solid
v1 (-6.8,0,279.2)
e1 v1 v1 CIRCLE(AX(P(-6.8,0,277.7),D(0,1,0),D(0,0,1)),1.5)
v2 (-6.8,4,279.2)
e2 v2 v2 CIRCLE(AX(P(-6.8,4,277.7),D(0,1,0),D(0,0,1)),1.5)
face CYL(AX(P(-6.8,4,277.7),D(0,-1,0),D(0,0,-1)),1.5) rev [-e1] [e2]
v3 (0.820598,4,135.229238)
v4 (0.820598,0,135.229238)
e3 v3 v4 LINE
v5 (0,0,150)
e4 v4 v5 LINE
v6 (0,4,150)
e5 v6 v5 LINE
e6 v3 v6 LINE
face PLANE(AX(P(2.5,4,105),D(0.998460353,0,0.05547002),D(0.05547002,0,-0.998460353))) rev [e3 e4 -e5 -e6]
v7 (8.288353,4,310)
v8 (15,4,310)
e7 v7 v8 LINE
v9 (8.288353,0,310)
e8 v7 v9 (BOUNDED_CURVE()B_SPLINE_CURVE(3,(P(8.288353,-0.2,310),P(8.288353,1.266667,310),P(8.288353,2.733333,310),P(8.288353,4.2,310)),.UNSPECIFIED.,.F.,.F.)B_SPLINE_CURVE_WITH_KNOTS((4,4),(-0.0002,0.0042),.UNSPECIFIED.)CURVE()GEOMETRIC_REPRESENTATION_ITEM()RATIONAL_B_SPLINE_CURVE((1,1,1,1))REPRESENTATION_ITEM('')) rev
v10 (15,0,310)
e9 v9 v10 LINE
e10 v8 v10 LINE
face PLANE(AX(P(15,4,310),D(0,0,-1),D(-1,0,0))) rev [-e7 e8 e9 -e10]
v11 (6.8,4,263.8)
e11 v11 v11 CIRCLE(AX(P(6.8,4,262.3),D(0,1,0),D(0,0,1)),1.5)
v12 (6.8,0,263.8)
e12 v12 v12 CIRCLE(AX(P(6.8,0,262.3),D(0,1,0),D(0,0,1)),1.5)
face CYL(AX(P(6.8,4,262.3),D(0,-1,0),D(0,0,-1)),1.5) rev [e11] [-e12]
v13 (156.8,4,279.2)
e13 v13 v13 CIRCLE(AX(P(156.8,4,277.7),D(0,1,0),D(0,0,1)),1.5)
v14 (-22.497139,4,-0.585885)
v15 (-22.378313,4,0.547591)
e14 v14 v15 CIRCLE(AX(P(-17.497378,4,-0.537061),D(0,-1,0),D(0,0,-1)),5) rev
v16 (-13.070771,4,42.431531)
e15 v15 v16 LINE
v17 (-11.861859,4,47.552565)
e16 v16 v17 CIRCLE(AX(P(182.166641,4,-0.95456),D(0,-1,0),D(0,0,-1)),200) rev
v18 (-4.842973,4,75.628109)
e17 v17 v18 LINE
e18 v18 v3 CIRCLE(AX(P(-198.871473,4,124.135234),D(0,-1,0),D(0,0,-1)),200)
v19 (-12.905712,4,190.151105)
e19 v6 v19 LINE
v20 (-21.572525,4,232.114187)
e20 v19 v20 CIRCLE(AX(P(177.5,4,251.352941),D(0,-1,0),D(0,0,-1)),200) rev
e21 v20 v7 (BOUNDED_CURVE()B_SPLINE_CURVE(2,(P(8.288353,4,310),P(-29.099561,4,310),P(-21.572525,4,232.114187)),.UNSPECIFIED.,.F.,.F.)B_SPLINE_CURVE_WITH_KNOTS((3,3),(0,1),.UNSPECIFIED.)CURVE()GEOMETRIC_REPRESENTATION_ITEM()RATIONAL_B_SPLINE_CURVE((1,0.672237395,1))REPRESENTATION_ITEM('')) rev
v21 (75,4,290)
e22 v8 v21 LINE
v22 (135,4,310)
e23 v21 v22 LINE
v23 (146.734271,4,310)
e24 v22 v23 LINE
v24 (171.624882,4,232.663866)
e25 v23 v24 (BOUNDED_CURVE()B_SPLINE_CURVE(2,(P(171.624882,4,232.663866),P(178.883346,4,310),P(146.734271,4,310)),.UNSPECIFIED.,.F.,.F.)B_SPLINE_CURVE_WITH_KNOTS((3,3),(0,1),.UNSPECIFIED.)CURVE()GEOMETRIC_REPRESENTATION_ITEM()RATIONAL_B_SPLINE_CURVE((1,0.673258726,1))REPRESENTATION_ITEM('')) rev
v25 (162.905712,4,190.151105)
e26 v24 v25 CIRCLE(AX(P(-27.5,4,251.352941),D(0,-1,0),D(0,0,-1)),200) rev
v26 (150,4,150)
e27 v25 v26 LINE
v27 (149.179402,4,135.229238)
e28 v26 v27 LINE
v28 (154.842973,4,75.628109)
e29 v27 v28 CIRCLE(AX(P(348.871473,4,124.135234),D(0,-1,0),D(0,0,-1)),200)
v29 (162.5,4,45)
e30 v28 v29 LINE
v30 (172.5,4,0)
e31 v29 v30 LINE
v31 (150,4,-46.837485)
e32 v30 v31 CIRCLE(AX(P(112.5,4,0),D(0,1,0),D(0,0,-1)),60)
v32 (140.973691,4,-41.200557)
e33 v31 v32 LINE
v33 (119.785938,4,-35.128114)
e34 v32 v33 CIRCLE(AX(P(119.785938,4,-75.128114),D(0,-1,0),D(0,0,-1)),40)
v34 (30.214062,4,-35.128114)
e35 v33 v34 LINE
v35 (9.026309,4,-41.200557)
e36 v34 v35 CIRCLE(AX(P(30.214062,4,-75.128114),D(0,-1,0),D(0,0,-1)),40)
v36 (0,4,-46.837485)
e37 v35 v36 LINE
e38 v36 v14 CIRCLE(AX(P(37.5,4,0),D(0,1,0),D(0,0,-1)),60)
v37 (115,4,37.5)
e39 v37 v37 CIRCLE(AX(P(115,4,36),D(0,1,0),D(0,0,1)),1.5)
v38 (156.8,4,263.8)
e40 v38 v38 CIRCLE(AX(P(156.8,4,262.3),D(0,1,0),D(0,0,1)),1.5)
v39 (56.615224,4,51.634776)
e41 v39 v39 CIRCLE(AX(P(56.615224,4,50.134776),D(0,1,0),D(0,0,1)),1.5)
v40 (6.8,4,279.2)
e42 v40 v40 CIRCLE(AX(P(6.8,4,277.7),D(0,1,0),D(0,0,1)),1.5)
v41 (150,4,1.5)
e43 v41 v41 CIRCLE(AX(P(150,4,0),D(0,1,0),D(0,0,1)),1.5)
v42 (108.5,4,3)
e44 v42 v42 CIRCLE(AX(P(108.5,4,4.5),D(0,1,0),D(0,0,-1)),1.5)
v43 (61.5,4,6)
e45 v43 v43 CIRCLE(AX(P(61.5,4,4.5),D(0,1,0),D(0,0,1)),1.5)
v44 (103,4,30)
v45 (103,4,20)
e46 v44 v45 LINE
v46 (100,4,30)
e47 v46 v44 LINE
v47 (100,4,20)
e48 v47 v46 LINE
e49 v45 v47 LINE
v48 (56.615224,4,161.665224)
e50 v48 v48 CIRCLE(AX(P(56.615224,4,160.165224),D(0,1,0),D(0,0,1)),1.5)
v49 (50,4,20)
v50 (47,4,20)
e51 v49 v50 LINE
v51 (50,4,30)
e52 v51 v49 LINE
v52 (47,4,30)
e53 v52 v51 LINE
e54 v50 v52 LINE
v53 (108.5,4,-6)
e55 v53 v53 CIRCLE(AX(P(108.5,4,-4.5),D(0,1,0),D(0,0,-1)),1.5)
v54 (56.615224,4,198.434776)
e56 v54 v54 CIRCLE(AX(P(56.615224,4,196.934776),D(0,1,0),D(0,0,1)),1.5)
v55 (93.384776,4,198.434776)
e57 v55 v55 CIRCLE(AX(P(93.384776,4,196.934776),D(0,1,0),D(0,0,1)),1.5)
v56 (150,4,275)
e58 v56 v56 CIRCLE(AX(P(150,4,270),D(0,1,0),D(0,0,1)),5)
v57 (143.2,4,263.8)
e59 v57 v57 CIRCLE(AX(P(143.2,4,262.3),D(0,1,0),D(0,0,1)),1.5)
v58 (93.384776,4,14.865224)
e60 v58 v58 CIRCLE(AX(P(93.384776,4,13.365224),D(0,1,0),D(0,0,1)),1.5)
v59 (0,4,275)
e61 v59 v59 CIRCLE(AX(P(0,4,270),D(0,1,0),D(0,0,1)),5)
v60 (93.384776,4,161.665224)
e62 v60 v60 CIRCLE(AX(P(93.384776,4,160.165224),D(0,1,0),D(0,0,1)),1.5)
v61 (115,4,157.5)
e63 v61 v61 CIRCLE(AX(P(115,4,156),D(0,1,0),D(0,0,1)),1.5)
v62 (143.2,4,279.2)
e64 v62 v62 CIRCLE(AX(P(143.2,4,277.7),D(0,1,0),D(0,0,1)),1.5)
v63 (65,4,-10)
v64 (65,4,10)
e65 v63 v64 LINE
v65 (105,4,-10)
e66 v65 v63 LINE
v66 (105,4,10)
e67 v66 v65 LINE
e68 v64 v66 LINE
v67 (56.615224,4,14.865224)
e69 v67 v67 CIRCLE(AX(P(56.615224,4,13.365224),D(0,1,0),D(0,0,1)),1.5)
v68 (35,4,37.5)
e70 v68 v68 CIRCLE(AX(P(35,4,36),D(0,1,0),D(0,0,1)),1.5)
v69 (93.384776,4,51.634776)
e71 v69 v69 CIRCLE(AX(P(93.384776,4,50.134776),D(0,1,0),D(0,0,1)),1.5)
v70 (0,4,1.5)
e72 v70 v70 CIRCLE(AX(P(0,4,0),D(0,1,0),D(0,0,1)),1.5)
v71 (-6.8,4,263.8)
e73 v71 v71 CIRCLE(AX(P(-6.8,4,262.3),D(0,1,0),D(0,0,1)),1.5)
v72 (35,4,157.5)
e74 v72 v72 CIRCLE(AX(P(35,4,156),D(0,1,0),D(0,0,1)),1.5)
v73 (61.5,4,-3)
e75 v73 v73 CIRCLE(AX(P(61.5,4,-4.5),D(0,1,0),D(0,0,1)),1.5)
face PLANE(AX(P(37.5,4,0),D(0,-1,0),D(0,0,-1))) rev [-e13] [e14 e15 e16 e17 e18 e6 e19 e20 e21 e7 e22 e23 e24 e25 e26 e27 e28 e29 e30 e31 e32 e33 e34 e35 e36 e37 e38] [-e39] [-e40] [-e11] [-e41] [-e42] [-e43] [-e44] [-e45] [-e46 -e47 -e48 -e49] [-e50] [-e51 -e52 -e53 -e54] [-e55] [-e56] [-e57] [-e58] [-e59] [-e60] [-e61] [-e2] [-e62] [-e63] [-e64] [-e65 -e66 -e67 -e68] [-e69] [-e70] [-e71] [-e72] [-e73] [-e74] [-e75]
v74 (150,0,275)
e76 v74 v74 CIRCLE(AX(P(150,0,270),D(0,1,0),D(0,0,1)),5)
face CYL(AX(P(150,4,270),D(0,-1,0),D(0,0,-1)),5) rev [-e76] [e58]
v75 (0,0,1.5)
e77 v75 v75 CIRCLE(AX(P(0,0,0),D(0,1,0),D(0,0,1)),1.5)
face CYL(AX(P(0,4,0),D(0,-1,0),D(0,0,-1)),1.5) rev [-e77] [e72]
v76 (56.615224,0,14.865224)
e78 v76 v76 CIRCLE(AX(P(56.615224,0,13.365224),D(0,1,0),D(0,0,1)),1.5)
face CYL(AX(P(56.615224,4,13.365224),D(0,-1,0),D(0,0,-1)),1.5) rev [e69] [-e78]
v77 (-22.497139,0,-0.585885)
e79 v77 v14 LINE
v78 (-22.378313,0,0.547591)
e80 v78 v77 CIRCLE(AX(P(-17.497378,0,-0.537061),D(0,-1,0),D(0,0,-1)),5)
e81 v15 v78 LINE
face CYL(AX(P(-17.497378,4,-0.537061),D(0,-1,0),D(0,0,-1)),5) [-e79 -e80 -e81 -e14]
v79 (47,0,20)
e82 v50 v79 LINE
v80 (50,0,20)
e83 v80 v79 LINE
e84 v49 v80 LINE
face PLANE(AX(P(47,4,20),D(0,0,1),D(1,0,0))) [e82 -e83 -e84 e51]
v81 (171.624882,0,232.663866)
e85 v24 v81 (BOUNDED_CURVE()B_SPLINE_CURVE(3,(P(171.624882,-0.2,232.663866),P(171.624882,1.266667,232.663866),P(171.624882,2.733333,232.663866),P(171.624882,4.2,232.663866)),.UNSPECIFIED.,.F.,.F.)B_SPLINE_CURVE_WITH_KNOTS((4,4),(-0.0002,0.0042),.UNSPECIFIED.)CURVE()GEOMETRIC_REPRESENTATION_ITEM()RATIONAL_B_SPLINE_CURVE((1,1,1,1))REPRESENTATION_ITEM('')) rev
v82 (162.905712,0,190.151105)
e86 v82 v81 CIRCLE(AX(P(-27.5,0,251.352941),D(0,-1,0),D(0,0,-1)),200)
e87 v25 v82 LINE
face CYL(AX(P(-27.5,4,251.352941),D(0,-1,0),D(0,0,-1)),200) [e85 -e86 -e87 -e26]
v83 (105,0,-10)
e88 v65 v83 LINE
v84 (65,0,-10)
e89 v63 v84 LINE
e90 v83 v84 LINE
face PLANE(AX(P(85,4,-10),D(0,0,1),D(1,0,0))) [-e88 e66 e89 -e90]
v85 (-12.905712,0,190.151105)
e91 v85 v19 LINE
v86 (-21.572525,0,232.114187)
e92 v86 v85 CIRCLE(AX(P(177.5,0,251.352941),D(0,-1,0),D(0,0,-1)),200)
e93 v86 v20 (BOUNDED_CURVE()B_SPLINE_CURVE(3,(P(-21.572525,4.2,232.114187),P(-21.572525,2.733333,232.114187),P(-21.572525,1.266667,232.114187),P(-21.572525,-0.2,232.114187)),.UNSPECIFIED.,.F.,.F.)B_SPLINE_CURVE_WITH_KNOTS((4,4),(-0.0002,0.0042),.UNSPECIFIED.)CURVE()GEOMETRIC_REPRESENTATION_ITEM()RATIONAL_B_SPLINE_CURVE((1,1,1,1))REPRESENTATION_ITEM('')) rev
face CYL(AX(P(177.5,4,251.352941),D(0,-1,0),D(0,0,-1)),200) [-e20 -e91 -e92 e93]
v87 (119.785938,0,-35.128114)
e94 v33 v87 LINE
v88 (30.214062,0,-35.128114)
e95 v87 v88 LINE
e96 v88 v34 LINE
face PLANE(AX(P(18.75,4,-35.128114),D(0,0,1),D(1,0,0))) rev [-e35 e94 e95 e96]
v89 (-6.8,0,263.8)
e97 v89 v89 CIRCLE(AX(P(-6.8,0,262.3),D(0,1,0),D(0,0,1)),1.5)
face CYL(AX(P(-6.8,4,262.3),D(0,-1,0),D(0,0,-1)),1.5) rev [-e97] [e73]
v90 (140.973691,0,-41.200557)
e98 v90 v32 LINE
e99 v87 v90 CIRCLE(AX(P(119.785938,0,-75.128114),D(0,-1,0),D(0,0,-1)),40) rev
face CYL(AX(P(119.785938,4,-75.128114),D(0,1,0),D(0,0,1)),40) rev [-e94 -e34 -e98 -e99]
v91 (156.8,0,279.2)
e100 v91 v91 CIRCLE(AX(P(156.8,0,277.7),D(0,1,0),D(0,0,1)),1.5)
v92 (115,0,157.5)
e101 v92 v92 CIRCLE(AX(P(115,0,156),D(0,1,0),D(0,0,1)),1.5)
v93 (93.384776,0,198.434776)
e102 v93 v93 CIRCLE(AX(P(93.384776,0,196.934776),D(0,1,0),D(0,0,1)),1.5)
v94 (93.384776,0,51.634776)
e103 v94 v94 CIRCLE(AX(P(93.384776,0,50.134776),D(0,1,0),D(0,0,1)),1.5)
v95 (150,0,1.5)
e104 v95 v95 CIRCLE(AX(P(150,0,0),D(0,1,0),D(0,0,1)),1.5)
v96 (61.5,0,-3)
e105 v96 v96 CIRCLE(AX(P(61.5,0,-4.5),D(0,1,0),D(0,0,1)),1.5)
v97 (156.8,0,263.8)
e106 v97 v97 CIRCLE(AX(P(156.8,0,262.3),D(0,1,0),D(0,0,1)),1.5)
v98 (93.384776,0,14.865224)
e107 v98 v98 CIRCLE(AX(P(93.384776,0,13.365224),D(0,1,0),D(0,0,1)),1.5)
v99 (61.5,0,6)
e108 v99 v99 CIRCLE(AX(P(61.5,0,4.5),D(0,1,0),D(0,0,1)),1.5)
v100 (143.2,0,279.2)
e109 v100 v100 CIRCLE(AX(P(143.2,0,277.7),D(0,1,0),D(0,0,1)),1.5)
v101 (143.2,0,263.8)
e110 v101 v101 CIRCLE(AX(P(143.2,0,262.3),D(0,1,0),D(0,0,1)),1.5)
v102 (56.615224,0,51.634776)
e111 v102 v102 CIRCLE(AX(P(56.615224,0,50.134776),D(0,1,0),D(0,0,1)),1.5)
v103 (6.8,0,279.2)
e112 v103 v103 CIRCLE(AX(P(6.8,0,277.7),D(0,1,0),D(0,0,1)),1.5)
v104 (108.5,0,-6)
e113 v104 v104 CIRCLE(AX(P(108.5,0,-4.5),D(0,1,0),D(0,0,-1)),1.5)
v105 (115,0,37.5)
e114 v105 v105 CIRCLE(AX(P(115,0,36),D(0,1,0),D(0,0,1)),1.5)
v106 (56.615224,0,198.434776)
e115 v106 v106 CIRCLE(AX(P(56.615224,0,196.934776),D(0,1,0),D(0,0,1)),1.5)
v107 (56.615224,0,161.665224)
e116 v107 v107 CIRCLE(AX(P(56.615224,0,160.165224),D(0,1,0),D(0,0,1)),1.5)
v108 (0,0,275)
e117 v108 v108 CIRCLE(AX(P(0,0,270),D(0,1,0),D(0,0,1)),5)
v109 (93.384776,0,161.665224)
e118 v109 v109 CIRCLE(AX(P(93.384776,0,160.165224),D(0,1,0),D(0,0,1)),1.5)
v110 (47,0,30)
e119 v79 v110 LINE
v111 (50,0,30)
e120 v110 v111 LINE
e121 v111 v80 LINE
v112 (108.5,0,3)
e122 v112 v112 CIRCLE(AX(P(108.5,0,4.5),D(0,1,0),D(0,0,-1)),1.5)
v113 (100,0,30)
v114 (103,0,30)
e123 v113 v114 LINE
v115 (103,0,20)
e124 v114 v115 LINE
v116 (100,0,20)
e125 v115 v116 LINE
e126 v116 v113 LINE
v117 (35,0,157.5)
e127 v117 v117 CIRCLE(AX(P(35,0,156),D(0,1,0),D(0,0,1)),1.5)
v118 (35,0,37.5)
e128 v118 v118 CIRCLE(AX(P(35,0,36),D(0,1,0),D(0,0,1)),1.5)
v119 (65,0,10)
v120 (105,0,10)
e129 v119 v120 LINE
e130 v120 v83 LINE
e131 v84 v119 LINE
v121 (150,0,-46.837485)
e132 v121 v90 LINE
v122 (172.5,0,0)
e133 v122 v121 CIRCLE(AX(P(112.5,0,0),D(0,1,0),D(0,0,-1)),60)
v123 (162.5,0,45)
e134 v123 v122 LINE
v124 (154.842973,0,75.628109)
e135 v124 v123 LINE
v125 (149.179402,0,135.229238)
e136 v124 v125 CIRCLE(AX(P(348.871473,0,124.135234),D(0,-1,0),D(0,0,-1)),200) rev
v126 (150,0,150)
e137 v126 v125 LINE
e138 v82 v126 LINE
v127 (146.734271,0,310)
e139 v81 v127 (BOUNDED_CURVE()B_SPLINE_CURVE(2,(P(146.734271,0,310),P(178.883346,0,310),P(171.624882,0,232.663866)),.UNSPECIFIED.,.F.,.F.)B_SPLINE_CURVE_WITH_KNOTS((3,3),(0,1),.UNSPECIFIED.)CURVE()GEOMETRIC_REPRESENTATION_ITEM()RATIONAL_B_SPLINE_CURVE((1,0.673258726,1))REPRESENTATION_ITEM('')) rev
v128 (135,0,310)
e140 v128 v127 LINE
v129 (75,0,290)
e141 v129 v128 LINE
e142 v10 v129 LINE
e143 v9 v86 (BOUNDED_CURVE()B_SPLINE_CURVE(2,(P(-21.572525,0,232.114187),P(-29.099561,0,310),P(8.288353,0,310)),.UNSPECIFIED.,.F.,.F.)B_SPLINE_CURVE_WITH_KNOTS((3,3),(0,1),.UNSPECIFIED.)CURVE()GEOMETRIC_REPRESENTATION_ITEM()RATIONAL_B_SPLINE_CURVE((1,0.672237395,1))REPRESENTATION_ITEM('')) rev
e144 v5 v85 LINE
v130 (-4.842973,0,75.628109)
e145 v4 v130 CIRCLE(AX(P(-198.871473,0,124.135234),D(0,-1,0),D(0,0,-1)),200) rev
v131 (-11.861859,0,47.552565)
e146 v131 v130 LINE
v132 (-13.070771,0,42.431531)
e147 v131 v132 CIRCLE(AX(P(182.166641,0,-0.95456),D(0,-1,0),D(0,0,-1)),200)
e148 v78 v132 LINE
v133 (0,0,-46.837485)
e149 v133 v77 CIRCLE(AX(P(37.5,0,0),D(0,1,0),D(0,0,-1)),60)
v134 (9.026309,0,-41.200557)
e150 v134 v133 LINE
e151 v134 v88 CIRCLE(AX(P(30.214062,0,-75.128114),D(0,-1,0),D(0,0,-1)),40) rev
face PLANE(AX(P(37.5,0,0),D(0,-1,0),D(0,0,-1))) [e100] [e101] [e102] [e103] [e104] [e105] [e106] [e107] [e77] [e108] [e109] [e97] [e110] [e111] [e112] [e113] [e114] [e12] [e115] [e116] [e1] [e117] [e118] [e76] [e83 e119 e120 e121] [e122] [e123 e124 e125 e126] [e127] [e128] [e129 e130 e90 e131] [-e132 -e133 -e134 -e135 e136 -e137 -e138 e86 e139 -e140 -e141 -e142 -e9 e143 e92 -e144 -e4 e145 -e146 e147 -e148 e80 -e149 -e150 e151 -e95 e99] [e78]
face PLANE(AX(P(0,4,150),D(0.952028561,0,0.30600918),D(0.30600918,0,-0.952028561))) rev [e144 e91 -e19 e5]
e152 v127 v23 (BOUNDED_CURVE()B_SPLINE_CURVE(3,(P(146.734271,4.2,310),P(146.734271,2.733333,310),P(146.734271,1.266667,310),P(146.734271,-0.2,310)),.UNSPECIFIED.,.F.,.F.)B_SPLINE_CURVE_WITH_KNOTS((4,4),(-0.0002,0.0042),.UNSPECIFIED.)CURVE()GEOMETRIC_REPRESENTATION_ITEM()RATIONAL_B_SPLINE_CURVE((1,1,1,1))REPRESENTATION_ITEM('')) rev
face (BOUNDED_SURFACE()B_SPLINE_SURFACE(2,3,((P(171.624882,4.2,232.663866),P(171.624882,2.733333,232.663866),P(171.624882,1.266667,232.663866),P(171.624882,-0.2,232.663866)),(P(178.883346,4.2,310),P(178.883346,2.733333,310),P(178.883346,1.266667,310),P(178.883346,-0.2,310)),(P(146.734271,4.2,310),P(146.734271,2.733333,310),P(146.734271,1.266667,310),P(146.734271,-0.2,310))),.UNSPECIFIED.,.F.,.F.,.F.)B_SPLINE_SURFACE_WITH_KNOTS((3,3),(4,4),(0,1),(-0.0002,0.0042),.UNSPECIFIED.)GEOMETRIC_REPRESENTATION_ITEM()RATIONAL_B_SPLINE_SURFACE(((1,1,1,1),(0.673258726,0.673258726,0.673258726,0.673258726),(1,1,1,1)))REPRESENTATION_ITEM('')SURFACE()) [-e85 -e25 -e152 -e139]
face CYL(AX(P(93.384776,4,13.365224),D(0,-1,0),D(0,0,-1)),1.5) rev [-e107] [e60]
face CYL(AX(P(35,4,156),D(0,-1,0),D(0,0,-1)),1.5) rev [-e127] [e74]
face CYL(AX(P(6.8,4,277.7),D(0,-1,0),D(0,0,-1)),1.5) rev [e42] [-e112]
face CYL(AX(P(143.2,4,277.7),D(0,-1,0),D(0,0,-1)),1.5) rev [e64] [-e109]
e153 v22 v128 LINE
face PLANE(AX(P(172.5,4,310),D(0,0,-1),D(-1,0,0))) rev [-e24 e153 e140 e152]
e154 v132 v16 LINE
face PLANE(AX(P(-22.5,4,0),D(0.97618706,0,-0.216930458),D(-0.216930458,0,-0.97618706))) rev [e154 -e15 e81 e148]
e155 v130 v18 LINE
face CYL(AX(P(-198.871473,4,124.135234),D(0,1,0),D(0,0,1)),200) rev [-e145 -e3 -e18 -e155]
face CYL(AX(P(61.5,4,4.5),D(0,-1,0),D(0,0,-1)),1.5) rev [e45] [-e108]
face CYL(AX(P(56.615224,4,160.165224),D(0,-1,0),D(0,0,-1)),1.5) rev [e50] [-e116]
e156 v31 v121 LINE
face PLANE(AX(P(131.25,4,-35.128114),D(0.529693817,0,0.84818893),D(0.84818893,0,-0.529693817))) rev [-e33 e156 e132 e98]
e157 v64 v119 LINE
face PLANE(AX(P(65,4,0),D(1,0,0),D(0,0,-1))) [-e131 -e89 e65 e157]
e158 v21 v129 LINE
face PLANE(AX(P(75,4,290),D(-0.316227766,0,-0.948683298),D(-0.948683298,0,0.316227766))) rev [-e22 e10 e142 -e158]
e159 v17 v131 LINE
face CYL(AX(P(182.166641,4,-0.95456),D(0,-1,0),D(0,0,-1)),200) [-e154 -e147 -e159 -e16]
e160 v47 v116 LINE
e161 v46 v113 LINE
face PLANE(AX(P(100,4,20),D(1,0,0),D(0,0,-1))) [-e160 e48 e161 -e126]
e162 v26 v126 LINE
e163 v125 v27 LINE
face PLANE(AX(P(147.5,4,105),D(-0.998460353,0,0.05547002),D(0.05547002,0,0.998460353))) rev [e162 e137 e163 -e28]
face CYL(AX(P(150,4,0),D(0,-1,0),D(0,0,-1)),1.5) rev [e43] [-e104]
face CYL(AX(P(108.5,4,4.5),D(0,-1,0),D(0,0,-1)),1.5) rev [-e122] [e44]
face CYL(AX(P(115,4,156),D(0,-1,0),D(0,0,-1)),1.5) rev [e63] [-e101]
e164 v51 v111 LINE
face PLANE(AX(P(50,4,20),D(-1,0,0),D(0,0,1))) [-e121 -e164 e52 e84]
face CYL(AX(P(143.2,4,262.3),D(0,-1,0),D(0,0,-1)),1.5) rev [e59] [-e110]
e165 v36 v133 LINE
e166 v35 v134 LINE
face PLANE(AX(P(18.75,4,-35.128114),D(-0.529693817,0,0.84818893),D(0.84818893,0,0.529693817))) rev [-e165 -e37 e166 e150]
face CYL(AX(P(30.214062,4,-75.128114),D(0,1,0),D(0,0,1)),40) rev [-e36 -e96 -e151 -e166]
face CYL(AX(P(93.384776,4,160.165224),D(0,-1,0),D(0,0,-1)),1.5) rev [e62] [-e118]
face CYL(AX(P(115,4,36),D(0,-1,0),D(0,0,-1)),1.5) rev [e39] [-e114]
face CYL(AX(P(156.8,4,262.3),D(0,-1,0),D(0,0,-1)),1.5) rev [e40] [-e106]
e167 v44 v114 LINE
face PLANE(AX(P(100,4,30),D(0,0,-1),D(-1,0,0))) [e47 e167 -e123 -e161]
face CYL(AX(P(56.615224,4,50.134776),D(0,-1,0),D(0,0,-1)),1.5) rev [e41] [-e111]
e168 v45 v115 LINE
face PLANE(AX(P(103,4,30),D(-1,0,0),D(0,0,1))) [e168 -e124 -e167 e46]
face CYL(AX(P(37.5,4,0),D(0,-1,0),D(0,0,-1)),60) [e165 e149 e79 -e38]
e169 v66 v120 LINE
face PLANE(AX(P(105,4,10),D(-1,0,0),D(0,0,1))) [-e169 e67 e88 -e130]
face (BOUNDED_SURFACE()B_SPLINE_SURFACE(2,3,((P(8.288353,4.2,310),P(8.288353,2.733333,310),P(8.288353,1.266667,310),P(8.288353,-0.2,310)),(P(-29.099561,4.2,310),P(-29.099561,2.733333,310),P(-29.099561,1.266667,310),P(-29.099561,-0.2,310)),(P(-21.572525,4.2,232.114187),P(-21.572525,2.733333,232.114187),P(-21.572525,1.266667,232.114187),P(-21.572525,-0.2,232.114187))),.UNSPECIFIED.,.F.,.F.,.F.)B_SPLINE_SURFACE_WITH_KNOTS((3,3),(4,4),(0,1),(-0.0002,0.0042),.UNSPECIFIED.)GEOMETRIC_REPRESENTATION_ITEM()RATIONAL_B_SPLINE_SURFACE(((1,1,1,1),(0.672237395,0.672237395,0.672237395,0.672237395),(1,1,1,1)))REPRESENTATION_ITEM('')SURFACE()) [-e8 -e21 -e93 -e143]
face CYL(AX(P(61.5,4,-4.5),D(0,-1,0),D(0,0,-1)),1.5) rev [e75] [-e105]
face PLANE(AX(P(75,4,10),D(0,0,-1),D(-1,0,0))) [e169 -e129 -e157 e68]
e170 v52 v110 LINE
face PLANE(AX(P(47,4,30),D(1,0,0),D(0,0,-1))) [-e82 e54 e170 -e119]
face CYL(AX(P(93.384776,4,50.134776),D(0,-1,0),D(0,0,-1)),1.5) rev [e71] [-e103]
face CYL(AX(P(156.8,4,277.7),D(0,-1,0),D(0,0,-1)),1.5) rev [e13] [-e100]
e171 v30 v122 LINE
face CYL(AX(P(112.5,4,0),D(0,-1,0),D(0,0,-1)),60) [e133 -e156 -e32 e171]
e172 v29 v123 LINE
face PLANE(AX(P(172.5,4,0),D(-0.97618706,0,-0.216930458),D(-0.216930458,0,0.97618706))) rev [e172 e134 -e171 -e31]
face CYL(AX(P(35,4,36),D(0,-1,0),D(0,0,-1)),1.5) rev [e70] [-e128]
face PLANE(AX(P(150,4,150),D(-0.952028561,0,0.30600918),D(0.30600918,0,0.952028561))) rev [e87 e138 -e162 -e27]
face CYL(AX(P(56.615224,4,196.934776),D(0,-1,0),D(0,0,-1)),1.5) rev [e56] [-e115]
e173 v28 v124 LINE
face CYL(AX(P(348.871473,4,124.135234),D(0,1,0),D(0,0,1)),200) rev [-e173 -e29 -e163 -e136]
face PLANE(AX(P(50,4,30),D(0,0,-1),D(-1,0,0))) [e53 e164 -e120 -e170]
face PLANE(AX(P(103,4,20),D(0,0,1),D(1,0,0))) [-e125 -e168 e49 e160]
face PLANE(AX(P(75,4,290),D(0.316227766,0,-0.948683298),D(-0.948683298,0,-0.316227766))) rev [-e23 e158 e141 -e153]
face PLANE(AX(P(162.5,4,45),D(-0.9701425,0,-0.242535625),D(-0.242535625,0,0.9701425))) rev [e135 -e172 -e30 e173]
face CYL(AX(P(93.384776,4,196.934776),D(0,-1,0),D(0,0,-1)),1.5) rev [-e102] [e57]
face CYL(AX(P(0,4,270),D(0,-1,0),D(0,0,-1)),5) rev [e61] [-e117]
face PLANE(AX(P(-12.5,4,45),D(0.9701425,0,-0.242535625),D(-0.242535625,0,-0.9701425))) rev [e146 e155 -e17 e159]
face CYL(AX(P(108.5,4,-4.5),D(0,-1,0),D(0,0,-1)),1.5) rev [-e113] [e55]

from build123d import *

# Parameters (mm, degrees)
SKETCH_3_R      = 1.5
SKETCH_3_R_2    = 5
SKETCH_3_W      = 3
SKETCH_3_H      = 10
EXTRUDE_1_DEPTH = 4
FILLET_2_R      = 5
FILLET_4_R      = 200
FILLET_5_R      = 200
FILLET_8_R      = 200
FILLET_9_R      = 200
FILLET_START    = -1
FILLET_10_DEPTH = 6
FILLET_11_DEPTH = 6
FILLET_13_R     = 200
FILLET_1_R      = 40


with BuildPart() as part:
    # Эскиз3 → Бобышка-Вытянуть1 (new body)
    with BuildSketch(Plane(origin=(0, 0, 0), x_dir=(1, 0, 0), z_dir=(0, 1, 0))):
        with BuildLine():
            Line((18.75, 35.128113741), (131.25, 35.128113741))
            Line((131.25, 35.128113741), (150, 46.837484988))
            ThreePointArc((150, 46.837484988), (166.583269132, 25.980762114), (172.5, 0))
            Line((172.5, 0), (162.5, -45))
            Line((162.5, -45), (147.5, -105))
            Line((147.5, -105), (150, -150))
            Line((150, -150), (172.5, -220))
            Line((172.5, -220), (172.5, -310))
            Line((172.5, -310), (135, -310))
            Line((135, -310), (75, -290))
            Line((75, -290), (15, -310))
            Line((15, -310), (-22.5, -310))
            Line((-22.5, -310), (-22.5, -220))
            Line((-22.5, -220), (0, -150))
            Line((0, -150), (2.5, -105))
            Line((2.5, -105), (-12.5, -45))
            Line((-12.5, -45), (-22.5, 0))
            ThreePointArc((-22.5, 0), (-16.583269132, 25.980762114), (0, 46.837484988))
            Line((0, 46.837484988), (18.75, 35.128113741))
        make_face()
        with Locations(Location((150, 0, 0), (0, 0, 270))):
            Circle(SKETCH_3_R, mode=Mode.SUBTRACT)
        with Locations(Location((0, 0, 0), (0, 0, 270))):
            Circle(SKETCH_3_R, mode=Mode.SUBTRACT)
        with Locations(Location((150, -270, 0), (0, 0, 270))):
            Circle(SKETCH_3_R_2, mode=Mode.SUBTRACT)
        with Locations(Location((0, -270, 0), (0, 0, 270))):
            Circle(SKETCH_3_R_2, mode=Mode.SUBTRACT)
        with Locations(Location((-6.8, -262.3, 0), (0, 0, 270))):
            Circle(SKETCH_3_R, mode=Mode.SUBTRACT)
        with Locations(Location((6.8, -262.3, 0), (0, 0, 270))):
            Circle(SKETCH_3_R, mode=Mode.SUBTRACT)
        with Locations(Location((-6.8, -277.7, 0), (0, 0, 270))):
            Circle(SKETCH_3_R, mode=Mode.SUBTRACT)
        with Locations(Location((6.8, -277.7, 0), (0, 0, 270))):
            Circle(SKETCH_3_R, mode=Mode.SUBTRACT)
        with Locations(Location((143.2, -262.3, 0), (0, 0, 270))):
            Circle(SKETCH_3_R, mode=Mode.SUBTRACT)
        with Locations(Location((156.8, -262.3, 0), (0, 0, 270))):
            Circle(SKETCH_3_R, mode=Mode.SUBTRACT)
        with Locations(Location((143.2, -277.7, 0), (0, 0, 270))):
            Circle(SKETCH_3_R, mode=Mode.SUBTRACT)
        with Locations(Location((156.8, -277.7, 0), (0, 0, 270))):
            Circle(SKETCH_3_R, mode=Mode.SUBTRACT)
        with Locations(Location((61.5, 4.5, 0), (0, 0, 270))):
            Circle(SKETCH_3_R, mode=Mode.SUBTRACT)
        with Locations(Location((61.5, -4.5, 0), (0, 0, 270))):
            Circle(SKETCH_3_R, mode=Mode.SUBTRACT)
        with Locations(Location((108.5, -4.5, 0), (0, 0, 90))):
            Circle(SKETCH_3_R, mode=Mode.SUBTRACT)
        with Locations(Location((108.5, 4.5, 0), (0, 0, 90))):
            Circle(SKETCH_3_R, mode=Mode.SUBTRACT)
        with Locations(Location((35, -36, 0), (0, 0, 270))):
            Circle(SKETCH_3_R, mode=Mode.SUBTRACT)
        with Locations(Location((115, -36, 0), (0, 0, 270))):
            Circle(SKETCH_3_R, mode=Mode.SUBTRACT)
        with Locations(Location((115, -156, 0), (0, 0, 270))):
            Circle(SKETCH_3_R, mode=Mode.SUBTRACT)
        with Locations(Location((35, -156, 0), (0, 0, 270))):
            Circle(SKETCH_3_R, mode=Mode.SUBTRACT)
        with Locations(Location((56.615223689, -196.934776311, 0), (0, 0, 270))):
            Circle(SKETCH_3_R, mode=Mode.SUBTRACT)
        with Locations(Location((93.384776311, -196.934776311, 0), (0, 0, 270))):
            Circle(SKETCH_3_R, mode=Mode.SUBTRACT)
        with Locations(Location((93.384776311, -160.165223689, 0), (0, 0, 270))):
            Circle(SKETCH_3_R, mode=Mode.SUBTRACT)
        with Locations(Location((56.615223689, -160.165223689, 0), (0, 0, 270))):
            Circle(SKETCH_3_R, mode=Mode.SUBTRACT)
        with Locations(Location((56.615223689, -50.134776311, 0), (0, 0, 270))):
            Circle(SKETCH_3_R, mode=Mode.SUBTRACT)
        with Locations(Location((93.384776311, -50.134776311, 0), (0, 0, 270))):
            Circle(SKETCH_3_R, mode=Mode.SUBTRACT)
        with Locations(Location((93.384776311, -13.365223689, 0), (0, 0, 270))):
            Circle(SKETCH_3_R, mode=Mode.SUBTRACT)
        with Locations(Location((56.615223689, -13.365223689, 0), (0, 0, 270))):
            Circle(SKETCH_3_R, mode=Mode.SUBTRACT)
        Polygon((65, 10), (65, 0), (65, -10), (75, -10), (105, -10), (105, 10), (85, 10), align=None, mode=Mode.SUBTRACT)
        with Locations((48.5, -25)):
            Rectangle(SKETCH_3_W, SKETCH_3_H, mode=Mode.SUBTRACT)
        with Locations((101.5, -25)):
            Rectangle(SKETCH_3_W, SKETCH_3_H, mode=Mode.SUBTRACT)
    extrude(amount=EXTRUDE_1_DEPTH)

    # Скругление2
    fillet_2_edges = [part.edges().sort_by_distance(p)[0] for p in [
        (-22.5, 2, 0),
    ]]
    fillet(fillet_2_edges, radius=FILLET_2_R)

    # Скругление4
    # the kernel refuses this fillet: 200 mm, written as the material it takes off along each edge
    with BuildSketch(Plane(origin=(-12.5, -6.577808748, 45), x_dir=(-0.21693045781865417, 0, -0.9761870601839532), z_dir=(0, 1, 0))) as fillet_4_piece_1:
        with BuildLine():
            CenterArc((FILLET_4_R * 0.0131556174964, -FILLET_4_R), FILLET_4_R, 90, 1.507435759)
            Line((-FILLET_4_R * 0.0131510645918, -FILLET_4_R * 0.000346080647153), (0, 0))
            Line((0, 0), (FILLET_4_R * 0.0131556174964, 0))
        make_face()
    extrude(amount=17.155617496, mode=Mode.SUBTRACT)

    # Скругление5
    fillet_5_edges = [part.edges().sort_by_distance(p)[0] for p in [
        (2.5, 2, 105),
    ]]
    fillet(fillet_5_edges, radius=FILLET_5_R)

    # Скругление8
    fillet_8_edges = [part.edges().sort_by_distance(p)[0] for p in [
        (-22.5, 2, 220),
    ]]
    fillet(fillet_8_edges, radius=FILLET_8_R)

    # Скругление9
    fillet_9_edges = [part.edges().sort_by_distance(p)[0] for p in [
        (172.5, 2, 220),
    ]]
    fillet(fillet_9_edges, radius=FILLET_9_R)

    # Скругление10: read off the stored shape, not the designer's step
    # Скругление10 outline → Скругление10 (cut)
    with BuildSketch(Plane(origin=(0, 0, 0), x_dir=(1, 0, 0), z_dir=(0, 1, 0)).offset(FILLET_START)):
        with BuildLine():
            Line((-22.5, -310), (8.288353461, -310))
            add(Edge.make_bspline(
                [(8.288353461, -310), (-29.099560998, -310), (-21.57252534, -232.114186903)],
                knots=[0, 0, 0, 1, 1, 1], degree=2, weights=[1, 0.672237395, 1]))
            ThreePointArc((-21.57252534, -232.114186903), (-22.267996771, -241.722392301), (-22.5, -251.352940882))
            Line((-22.5, -251.352940882), (-22.5, -310))
        make_face()
    extrude(amount=FILLET_10_DEPTH, mode=Mode.SUBTRACT)

    # Скругление11: read off the stored shape, not the designer's step
    # Скругление11 outline → Скругление11 (cut)
    with BuildSketch(Plane(origin=(0, 0, 0), x_dir=(1, 0, 0), z_dir=(0, 1, 0)).offset(FILLET_START)):
        with BuildLine():
            ThreePointArc((172.5, -251.352940882), (172.281100603, -241.998164461), (171.624881581, -232.663865588))
            add(Edge.make_bspline(
                [(171.624881581, -232.663865588), (178.883345855, -310), (146.734271383, -310)],
                knots=[0, 0, 0, 1, 1, 1], degree=2, weights=[1, 0.673258726, 1]))
            Line((146.734271383, -310), (172.5, -310))
            Line((172.5, -310), (172.5, -251.352940882))
        make_face()
    extrude(amount=FILLET_11_DEPTH, mode=Mode.SUBTRACT)

    # Скругление13
    fillet_13_edges = [part.edges().sort_by_distance(p)[0] for p in [
        (147.5, 2, 105),
    ]]
    fillet(fillet_13_edges, radius=FILLET_13_R)

    # Скругление1
    fillet_1_edges = [part.edges().sort_by_distance(p)[0] for p in [
        (18.75, 2, -35.128113741),
        (131.25, 2, -35.128113741),
    ]]
    fillet(fillet_1_edges, radius=FILLET_1_R)


solid = part.part
